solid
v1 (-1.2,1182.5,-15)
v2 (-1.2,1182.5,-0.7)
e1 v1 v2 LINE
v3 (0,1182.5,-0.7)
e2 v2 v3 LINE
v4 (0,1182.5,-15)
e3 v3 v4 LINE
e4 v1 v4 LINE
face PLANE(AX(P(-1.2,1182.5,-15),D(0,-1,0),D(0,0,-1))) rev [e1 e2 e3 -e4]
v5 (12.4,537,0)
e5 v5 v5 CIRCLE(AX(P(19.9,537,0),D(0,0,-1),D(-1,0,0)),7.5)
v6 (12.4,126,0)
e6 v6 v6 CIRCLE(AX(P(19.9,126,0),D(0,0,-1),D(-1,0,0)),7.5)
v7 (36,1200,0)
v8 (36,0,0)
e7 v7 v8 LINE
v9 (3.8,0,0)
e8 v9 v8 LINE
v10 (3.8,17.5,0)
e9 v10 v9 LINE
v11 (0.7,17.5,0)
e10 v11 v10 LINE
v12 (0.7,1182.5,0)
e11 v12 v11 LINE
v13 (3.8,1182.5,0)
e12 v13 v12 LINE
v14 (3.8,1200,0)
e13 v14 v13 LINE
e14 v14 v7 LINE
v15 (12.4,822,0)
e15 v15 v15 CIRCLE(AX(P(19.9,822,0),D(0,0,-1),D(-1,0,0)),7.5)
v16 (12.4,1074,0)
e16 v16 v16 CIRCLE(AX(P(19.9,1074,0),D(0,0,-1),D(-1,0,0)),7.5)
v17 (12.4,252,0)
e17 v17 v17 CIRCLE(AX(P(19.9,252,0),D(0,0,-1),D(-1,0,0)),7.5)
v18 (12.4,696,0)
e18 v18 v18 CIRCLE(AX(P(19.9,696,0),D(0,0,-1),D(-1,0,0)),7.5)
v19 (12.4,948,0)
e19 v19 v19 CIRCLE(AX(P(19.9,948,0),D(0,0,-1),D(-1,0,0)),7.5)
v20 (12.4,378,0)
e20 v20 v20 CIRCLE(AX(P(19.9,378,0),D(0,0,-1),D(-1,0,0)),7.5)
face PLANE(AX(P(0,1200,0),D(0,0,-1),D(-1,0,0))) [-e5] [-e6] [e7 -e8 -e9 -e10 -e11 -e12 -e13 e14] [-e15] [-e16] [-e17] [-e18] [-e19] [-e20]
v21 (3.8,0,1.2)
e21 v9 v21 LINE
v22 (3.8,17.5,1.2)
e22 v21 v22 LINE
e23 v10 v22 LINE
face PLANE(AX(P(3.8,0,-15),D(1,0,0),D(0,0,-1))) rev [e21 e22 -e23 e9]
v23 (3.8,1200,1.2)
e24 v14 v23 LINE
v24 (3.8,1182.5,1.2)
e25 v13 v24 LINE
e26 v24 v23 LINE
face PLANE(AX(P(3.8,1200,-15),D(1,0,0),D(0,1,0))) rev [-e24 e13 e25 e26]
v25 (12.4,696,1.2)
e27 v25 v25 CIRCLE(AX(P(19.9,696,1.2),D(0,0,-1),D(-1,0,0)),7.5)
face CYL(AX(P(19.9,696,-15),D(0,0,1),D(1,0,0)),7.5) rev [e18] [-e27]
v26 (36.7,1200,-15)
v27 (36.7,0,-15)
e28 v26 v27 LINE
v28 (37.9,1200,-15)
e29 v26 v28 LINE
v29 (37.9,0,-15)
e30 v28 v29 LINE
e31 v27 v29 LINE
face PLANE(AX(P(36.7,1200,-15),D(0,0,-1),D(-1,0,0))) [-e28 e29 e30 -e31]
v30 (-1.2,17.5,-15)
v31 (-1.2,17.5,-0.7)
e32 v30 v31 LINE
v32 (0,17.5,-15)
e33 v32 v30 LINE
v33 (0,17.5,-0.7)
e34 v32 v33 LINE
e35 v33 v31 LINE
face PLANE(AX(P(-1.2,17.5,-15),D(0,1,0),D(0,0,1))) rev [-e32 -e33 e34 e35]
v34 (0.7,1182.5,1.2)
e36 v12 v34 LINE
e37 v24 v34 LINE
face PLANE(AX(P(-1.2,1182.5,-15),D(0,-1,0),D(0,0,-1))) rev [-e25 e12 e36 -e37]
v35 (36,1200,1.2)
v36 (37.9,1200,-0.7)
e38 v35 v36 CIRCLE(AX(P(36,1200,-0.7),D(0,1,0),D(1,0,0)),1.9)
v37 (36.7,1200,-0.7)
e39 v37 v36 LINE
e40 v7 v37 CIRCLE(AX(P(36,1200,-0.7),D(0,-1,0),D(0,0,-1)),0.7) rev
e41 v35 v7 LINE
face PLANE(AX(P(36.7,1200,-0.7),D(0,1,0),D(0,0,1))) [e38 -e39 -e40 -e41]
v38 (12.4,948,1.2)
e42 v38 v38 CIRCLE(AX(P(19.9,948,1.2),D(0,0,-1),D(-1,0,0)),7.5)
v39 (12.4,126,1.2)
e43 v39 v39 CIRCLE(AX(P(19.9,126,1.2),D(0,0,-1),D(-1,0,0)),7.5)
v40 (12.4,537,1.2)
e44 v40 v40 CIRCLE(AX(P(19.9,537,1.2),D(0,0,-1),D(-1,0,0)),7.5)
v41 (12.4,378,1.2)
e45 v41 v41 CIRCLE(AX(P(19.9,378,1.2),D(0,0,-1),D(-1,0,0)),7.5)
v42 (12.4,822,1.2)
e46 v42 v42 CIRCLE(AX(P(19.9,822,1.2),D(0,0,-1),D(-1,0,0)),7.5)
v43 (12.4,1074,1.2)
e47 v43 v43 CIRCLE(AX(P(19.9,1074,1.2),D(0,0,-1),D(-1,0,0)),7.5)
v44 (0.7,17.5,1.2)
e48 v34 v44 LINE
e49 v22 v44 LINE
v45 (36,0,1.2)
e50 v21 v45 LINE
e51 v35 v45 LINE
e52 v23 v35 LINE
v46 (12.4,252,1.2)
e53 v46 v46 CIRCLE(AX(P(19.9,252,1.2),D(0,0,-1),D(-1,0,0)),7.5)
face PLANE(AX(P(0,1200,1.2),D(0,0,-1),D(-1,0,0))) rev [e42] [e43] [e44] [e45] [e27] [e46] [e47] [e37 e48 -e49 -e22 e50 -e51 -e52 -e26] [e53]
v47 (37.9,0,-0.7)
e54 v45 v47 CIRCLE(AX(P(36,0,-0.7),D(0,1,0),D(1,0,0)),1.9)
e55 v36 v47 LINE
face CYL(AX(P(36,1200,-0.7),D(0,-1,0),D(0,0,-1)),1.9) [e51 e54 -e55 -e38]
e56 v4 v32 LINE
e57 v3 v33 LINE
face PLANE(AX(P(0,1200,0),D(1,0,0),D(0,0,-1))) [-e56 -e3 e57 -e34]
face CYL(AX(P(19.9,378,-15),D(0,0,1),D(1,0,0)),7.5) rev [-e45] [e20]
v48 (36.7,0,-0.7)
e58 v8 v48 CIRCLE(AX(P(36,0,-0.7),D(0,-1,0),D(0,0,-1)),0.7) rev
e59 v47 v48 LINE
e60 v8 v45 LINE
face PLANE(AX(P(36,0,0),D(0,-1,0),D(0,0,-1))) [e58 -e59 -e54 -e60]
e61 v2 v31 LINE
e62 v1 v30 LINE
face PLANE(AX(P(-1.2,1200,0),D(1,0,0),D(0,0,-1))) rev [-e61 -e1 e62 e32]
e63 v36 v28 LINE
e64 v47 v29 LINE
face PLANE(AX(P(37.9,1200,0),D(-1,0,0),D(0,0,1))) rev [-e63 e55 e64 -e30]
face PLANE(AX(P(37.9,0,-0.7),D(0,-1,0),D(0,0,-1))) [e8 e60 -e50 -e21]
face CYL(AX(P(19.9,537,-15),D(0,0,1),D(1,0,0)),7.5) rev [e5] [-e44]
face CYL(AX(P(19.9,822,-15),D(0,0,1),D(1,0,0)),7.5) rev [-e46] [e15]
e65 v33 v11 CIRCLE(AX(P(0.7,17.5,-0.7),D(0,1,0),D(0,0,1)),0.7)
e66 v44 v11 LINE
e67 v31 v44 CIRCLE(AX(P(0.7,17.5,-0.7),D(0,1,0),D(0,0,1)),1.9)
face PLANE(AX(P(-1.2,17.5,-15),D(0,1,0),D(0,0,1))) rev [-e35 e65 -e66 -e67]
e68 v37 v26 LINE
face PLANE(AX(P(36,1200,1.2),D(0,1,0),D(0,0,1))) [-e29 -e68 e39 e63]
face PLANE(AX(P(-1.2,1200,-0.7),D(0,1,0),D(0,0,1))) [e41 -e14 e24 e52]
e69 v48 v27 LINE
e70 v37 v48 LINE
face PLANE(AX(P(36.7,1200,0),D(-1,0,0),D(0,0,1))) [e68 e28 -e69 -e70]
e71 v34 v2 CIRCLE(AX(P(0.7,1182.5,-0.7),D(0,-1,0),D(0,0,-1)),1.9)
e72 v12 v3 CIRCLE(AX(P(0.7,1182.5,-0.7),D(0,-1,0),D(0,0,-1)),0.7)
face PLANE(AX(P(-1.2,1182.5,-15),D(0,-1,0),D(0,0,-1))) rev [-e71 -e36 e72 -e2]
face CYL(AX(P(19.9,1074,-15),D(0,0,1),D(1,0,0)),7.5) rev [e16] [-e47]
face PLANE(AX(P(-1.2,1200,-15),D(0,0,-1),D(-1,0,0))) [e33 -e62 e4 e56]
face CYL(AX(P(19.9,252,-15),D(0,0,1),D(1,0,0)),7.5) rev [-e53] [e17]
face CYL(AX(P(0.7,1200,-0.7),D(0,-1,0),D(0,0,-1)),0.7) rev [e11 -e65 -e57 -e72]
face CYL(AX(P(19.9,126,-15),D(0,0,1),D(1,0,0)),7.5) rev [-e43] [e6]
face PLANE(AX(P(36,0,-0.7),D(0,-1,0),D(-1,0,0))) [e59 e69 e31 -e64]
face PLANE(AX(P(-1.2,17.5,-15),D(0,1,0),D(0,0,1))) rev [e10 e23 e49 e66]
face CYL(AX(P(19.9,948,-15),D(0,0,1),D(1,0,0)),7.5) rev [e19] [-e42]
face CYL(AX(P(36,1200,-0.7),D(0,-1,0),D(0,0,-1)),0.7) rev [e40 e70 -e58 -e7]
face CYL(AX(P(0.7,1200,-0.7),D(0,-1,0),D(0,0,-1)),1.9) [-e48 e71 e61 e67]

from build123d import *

# Parameters (mm, degrees)
BASE_FLANGE1_DEPTH      = 1200
SKETCH6_W               = 5
SKETCH6_H               = 17
CUT_EXTRUDE1_DEPTH      = 10
SKETCH7_W               = 5
SKETCH7_H               = 17.5
CUT_EXTRUDE2_DEPTH      = 1201.707645516
CUT_EXTRUDE3_DEPTH      = 1201.707645516
CUT_EXTRUDE3_DEPTH_BACK = 1201.707645516
SKETCH8_R               = 7.5


# Sheet-metal steps are written as plain solids
with BuildPart() as part:
    # Sketch1 → Base-Flange1 (new body)
    with BuildSketch(Plane(origin=(0, 0, 0), x_dir=(1, 0, 0), z_dir=(0, 1, 0))):
        with BuildLine():
            Line((36.7, 15), (36.7, 0.7))
            ThreePointArc((36.7, 0.7), (36.494974747, 0.205025253), (36, 0))
            Line((36, 0), (0.7, 0))
            ThreePointArc((0.7, 0), (0.205025253, 0.205025253), (0, 0.7))
            Line((0, 0.7), (0, 15))
            Line((0, 15), (-1.2, 15))
            Line((-1.2, 15), (-1.2, 0.7))
            ThreePointArc((-1.2, 0.7), (-0.643502884, -0.643502884), (0.7, -1.2))
            Line((0.7, -1.2), (36, -1.2))
            ThreePointArc((36, -1.2), (37.343502884, -0.643502884), (37.9, 0.7))
            Line((37.9, 0.7), (37.9, 15))
            Line((37.9, 15), (36.7, 15))
        make_face()
    extrude(amount=BASE_FLANGE1_DEPTH)

    # Sketch6 → Cut-Extrude1 (cut)
    with BuildSketch(Plane.ZY.offset(1.2)):
        with Locations((-12.5, 1191.5)):
            Rectangle(SKETCH6_W, SKETCH6_H)
        with Locations((-12.5, 8.5)):
            Rectangle(SKETCH6_W, SKETCH6_H)
    extrude(amount=-CUT_EXTRUDE1_DEPTH, mode=Mode.SUBTRACT)

    # Sketch7 → Cut-Extrude2 (cut, through all)
    with BuildSketch(Plane.XY.offset(1.2)):
        with Locations((1.3, 8.75)):
            Rectangle(SKETCH7_W, SKETCH7_H)
        with Locations((1.3, 1191.25)):
            Rectangle(SKETCH7_W, SKETCH7_H)
    extrude(amount=-CUT_EXTRUDE2_DEPTH, mode=Mode.SUBTRACT)

    # Sketch8 → Cut-Extrude3 (cut, two sides: drawn at the far end of the back side and taken through both)
    with BuildSketch(Plane.XY.offset(1.2).offset(-CUT_EXTRUDE3_DEPTH_BACK)):
        with Locations(Location((19.9, 126, 0), (0, 0, 180))):
            Circle(SKETCH8_R)
        with Locations(Location((19.9, 252, 0), (0, 0, 180))):
            Circle(SKETCH8_R)
        with Locations(Location((19.9, 378, 0), (0, 0, 180))):
            Circle(SKETCH8_R)
        with Locations(Location((19.9, 1074, 0), (0, 0, 180))):
            Circle(SKETCH8_R)
        with Locations(Location((19.9, 948, 0), (0, 0, 180))):
            Circle(SKETCH8_R)
        with Locations(Location((19.9, 822, 0), (0, 0, 180))):
            Circle(SKETCH8_R)
        with Locations(Location((19.9, 696, 0), (0, 0, 180))):
            Circle(SKETCH8_R)
        with Locations(Location((19.9, 537, 0), (0, 0, 180))):
            Circle(SKETCH8_R)
    extrude(amount=CUT_EXTRUDE3_DEPTH + CUT_EXTRUDE3_DEPTH_BACK, mode=Mode.SUBTRACT)


solid = part.part
